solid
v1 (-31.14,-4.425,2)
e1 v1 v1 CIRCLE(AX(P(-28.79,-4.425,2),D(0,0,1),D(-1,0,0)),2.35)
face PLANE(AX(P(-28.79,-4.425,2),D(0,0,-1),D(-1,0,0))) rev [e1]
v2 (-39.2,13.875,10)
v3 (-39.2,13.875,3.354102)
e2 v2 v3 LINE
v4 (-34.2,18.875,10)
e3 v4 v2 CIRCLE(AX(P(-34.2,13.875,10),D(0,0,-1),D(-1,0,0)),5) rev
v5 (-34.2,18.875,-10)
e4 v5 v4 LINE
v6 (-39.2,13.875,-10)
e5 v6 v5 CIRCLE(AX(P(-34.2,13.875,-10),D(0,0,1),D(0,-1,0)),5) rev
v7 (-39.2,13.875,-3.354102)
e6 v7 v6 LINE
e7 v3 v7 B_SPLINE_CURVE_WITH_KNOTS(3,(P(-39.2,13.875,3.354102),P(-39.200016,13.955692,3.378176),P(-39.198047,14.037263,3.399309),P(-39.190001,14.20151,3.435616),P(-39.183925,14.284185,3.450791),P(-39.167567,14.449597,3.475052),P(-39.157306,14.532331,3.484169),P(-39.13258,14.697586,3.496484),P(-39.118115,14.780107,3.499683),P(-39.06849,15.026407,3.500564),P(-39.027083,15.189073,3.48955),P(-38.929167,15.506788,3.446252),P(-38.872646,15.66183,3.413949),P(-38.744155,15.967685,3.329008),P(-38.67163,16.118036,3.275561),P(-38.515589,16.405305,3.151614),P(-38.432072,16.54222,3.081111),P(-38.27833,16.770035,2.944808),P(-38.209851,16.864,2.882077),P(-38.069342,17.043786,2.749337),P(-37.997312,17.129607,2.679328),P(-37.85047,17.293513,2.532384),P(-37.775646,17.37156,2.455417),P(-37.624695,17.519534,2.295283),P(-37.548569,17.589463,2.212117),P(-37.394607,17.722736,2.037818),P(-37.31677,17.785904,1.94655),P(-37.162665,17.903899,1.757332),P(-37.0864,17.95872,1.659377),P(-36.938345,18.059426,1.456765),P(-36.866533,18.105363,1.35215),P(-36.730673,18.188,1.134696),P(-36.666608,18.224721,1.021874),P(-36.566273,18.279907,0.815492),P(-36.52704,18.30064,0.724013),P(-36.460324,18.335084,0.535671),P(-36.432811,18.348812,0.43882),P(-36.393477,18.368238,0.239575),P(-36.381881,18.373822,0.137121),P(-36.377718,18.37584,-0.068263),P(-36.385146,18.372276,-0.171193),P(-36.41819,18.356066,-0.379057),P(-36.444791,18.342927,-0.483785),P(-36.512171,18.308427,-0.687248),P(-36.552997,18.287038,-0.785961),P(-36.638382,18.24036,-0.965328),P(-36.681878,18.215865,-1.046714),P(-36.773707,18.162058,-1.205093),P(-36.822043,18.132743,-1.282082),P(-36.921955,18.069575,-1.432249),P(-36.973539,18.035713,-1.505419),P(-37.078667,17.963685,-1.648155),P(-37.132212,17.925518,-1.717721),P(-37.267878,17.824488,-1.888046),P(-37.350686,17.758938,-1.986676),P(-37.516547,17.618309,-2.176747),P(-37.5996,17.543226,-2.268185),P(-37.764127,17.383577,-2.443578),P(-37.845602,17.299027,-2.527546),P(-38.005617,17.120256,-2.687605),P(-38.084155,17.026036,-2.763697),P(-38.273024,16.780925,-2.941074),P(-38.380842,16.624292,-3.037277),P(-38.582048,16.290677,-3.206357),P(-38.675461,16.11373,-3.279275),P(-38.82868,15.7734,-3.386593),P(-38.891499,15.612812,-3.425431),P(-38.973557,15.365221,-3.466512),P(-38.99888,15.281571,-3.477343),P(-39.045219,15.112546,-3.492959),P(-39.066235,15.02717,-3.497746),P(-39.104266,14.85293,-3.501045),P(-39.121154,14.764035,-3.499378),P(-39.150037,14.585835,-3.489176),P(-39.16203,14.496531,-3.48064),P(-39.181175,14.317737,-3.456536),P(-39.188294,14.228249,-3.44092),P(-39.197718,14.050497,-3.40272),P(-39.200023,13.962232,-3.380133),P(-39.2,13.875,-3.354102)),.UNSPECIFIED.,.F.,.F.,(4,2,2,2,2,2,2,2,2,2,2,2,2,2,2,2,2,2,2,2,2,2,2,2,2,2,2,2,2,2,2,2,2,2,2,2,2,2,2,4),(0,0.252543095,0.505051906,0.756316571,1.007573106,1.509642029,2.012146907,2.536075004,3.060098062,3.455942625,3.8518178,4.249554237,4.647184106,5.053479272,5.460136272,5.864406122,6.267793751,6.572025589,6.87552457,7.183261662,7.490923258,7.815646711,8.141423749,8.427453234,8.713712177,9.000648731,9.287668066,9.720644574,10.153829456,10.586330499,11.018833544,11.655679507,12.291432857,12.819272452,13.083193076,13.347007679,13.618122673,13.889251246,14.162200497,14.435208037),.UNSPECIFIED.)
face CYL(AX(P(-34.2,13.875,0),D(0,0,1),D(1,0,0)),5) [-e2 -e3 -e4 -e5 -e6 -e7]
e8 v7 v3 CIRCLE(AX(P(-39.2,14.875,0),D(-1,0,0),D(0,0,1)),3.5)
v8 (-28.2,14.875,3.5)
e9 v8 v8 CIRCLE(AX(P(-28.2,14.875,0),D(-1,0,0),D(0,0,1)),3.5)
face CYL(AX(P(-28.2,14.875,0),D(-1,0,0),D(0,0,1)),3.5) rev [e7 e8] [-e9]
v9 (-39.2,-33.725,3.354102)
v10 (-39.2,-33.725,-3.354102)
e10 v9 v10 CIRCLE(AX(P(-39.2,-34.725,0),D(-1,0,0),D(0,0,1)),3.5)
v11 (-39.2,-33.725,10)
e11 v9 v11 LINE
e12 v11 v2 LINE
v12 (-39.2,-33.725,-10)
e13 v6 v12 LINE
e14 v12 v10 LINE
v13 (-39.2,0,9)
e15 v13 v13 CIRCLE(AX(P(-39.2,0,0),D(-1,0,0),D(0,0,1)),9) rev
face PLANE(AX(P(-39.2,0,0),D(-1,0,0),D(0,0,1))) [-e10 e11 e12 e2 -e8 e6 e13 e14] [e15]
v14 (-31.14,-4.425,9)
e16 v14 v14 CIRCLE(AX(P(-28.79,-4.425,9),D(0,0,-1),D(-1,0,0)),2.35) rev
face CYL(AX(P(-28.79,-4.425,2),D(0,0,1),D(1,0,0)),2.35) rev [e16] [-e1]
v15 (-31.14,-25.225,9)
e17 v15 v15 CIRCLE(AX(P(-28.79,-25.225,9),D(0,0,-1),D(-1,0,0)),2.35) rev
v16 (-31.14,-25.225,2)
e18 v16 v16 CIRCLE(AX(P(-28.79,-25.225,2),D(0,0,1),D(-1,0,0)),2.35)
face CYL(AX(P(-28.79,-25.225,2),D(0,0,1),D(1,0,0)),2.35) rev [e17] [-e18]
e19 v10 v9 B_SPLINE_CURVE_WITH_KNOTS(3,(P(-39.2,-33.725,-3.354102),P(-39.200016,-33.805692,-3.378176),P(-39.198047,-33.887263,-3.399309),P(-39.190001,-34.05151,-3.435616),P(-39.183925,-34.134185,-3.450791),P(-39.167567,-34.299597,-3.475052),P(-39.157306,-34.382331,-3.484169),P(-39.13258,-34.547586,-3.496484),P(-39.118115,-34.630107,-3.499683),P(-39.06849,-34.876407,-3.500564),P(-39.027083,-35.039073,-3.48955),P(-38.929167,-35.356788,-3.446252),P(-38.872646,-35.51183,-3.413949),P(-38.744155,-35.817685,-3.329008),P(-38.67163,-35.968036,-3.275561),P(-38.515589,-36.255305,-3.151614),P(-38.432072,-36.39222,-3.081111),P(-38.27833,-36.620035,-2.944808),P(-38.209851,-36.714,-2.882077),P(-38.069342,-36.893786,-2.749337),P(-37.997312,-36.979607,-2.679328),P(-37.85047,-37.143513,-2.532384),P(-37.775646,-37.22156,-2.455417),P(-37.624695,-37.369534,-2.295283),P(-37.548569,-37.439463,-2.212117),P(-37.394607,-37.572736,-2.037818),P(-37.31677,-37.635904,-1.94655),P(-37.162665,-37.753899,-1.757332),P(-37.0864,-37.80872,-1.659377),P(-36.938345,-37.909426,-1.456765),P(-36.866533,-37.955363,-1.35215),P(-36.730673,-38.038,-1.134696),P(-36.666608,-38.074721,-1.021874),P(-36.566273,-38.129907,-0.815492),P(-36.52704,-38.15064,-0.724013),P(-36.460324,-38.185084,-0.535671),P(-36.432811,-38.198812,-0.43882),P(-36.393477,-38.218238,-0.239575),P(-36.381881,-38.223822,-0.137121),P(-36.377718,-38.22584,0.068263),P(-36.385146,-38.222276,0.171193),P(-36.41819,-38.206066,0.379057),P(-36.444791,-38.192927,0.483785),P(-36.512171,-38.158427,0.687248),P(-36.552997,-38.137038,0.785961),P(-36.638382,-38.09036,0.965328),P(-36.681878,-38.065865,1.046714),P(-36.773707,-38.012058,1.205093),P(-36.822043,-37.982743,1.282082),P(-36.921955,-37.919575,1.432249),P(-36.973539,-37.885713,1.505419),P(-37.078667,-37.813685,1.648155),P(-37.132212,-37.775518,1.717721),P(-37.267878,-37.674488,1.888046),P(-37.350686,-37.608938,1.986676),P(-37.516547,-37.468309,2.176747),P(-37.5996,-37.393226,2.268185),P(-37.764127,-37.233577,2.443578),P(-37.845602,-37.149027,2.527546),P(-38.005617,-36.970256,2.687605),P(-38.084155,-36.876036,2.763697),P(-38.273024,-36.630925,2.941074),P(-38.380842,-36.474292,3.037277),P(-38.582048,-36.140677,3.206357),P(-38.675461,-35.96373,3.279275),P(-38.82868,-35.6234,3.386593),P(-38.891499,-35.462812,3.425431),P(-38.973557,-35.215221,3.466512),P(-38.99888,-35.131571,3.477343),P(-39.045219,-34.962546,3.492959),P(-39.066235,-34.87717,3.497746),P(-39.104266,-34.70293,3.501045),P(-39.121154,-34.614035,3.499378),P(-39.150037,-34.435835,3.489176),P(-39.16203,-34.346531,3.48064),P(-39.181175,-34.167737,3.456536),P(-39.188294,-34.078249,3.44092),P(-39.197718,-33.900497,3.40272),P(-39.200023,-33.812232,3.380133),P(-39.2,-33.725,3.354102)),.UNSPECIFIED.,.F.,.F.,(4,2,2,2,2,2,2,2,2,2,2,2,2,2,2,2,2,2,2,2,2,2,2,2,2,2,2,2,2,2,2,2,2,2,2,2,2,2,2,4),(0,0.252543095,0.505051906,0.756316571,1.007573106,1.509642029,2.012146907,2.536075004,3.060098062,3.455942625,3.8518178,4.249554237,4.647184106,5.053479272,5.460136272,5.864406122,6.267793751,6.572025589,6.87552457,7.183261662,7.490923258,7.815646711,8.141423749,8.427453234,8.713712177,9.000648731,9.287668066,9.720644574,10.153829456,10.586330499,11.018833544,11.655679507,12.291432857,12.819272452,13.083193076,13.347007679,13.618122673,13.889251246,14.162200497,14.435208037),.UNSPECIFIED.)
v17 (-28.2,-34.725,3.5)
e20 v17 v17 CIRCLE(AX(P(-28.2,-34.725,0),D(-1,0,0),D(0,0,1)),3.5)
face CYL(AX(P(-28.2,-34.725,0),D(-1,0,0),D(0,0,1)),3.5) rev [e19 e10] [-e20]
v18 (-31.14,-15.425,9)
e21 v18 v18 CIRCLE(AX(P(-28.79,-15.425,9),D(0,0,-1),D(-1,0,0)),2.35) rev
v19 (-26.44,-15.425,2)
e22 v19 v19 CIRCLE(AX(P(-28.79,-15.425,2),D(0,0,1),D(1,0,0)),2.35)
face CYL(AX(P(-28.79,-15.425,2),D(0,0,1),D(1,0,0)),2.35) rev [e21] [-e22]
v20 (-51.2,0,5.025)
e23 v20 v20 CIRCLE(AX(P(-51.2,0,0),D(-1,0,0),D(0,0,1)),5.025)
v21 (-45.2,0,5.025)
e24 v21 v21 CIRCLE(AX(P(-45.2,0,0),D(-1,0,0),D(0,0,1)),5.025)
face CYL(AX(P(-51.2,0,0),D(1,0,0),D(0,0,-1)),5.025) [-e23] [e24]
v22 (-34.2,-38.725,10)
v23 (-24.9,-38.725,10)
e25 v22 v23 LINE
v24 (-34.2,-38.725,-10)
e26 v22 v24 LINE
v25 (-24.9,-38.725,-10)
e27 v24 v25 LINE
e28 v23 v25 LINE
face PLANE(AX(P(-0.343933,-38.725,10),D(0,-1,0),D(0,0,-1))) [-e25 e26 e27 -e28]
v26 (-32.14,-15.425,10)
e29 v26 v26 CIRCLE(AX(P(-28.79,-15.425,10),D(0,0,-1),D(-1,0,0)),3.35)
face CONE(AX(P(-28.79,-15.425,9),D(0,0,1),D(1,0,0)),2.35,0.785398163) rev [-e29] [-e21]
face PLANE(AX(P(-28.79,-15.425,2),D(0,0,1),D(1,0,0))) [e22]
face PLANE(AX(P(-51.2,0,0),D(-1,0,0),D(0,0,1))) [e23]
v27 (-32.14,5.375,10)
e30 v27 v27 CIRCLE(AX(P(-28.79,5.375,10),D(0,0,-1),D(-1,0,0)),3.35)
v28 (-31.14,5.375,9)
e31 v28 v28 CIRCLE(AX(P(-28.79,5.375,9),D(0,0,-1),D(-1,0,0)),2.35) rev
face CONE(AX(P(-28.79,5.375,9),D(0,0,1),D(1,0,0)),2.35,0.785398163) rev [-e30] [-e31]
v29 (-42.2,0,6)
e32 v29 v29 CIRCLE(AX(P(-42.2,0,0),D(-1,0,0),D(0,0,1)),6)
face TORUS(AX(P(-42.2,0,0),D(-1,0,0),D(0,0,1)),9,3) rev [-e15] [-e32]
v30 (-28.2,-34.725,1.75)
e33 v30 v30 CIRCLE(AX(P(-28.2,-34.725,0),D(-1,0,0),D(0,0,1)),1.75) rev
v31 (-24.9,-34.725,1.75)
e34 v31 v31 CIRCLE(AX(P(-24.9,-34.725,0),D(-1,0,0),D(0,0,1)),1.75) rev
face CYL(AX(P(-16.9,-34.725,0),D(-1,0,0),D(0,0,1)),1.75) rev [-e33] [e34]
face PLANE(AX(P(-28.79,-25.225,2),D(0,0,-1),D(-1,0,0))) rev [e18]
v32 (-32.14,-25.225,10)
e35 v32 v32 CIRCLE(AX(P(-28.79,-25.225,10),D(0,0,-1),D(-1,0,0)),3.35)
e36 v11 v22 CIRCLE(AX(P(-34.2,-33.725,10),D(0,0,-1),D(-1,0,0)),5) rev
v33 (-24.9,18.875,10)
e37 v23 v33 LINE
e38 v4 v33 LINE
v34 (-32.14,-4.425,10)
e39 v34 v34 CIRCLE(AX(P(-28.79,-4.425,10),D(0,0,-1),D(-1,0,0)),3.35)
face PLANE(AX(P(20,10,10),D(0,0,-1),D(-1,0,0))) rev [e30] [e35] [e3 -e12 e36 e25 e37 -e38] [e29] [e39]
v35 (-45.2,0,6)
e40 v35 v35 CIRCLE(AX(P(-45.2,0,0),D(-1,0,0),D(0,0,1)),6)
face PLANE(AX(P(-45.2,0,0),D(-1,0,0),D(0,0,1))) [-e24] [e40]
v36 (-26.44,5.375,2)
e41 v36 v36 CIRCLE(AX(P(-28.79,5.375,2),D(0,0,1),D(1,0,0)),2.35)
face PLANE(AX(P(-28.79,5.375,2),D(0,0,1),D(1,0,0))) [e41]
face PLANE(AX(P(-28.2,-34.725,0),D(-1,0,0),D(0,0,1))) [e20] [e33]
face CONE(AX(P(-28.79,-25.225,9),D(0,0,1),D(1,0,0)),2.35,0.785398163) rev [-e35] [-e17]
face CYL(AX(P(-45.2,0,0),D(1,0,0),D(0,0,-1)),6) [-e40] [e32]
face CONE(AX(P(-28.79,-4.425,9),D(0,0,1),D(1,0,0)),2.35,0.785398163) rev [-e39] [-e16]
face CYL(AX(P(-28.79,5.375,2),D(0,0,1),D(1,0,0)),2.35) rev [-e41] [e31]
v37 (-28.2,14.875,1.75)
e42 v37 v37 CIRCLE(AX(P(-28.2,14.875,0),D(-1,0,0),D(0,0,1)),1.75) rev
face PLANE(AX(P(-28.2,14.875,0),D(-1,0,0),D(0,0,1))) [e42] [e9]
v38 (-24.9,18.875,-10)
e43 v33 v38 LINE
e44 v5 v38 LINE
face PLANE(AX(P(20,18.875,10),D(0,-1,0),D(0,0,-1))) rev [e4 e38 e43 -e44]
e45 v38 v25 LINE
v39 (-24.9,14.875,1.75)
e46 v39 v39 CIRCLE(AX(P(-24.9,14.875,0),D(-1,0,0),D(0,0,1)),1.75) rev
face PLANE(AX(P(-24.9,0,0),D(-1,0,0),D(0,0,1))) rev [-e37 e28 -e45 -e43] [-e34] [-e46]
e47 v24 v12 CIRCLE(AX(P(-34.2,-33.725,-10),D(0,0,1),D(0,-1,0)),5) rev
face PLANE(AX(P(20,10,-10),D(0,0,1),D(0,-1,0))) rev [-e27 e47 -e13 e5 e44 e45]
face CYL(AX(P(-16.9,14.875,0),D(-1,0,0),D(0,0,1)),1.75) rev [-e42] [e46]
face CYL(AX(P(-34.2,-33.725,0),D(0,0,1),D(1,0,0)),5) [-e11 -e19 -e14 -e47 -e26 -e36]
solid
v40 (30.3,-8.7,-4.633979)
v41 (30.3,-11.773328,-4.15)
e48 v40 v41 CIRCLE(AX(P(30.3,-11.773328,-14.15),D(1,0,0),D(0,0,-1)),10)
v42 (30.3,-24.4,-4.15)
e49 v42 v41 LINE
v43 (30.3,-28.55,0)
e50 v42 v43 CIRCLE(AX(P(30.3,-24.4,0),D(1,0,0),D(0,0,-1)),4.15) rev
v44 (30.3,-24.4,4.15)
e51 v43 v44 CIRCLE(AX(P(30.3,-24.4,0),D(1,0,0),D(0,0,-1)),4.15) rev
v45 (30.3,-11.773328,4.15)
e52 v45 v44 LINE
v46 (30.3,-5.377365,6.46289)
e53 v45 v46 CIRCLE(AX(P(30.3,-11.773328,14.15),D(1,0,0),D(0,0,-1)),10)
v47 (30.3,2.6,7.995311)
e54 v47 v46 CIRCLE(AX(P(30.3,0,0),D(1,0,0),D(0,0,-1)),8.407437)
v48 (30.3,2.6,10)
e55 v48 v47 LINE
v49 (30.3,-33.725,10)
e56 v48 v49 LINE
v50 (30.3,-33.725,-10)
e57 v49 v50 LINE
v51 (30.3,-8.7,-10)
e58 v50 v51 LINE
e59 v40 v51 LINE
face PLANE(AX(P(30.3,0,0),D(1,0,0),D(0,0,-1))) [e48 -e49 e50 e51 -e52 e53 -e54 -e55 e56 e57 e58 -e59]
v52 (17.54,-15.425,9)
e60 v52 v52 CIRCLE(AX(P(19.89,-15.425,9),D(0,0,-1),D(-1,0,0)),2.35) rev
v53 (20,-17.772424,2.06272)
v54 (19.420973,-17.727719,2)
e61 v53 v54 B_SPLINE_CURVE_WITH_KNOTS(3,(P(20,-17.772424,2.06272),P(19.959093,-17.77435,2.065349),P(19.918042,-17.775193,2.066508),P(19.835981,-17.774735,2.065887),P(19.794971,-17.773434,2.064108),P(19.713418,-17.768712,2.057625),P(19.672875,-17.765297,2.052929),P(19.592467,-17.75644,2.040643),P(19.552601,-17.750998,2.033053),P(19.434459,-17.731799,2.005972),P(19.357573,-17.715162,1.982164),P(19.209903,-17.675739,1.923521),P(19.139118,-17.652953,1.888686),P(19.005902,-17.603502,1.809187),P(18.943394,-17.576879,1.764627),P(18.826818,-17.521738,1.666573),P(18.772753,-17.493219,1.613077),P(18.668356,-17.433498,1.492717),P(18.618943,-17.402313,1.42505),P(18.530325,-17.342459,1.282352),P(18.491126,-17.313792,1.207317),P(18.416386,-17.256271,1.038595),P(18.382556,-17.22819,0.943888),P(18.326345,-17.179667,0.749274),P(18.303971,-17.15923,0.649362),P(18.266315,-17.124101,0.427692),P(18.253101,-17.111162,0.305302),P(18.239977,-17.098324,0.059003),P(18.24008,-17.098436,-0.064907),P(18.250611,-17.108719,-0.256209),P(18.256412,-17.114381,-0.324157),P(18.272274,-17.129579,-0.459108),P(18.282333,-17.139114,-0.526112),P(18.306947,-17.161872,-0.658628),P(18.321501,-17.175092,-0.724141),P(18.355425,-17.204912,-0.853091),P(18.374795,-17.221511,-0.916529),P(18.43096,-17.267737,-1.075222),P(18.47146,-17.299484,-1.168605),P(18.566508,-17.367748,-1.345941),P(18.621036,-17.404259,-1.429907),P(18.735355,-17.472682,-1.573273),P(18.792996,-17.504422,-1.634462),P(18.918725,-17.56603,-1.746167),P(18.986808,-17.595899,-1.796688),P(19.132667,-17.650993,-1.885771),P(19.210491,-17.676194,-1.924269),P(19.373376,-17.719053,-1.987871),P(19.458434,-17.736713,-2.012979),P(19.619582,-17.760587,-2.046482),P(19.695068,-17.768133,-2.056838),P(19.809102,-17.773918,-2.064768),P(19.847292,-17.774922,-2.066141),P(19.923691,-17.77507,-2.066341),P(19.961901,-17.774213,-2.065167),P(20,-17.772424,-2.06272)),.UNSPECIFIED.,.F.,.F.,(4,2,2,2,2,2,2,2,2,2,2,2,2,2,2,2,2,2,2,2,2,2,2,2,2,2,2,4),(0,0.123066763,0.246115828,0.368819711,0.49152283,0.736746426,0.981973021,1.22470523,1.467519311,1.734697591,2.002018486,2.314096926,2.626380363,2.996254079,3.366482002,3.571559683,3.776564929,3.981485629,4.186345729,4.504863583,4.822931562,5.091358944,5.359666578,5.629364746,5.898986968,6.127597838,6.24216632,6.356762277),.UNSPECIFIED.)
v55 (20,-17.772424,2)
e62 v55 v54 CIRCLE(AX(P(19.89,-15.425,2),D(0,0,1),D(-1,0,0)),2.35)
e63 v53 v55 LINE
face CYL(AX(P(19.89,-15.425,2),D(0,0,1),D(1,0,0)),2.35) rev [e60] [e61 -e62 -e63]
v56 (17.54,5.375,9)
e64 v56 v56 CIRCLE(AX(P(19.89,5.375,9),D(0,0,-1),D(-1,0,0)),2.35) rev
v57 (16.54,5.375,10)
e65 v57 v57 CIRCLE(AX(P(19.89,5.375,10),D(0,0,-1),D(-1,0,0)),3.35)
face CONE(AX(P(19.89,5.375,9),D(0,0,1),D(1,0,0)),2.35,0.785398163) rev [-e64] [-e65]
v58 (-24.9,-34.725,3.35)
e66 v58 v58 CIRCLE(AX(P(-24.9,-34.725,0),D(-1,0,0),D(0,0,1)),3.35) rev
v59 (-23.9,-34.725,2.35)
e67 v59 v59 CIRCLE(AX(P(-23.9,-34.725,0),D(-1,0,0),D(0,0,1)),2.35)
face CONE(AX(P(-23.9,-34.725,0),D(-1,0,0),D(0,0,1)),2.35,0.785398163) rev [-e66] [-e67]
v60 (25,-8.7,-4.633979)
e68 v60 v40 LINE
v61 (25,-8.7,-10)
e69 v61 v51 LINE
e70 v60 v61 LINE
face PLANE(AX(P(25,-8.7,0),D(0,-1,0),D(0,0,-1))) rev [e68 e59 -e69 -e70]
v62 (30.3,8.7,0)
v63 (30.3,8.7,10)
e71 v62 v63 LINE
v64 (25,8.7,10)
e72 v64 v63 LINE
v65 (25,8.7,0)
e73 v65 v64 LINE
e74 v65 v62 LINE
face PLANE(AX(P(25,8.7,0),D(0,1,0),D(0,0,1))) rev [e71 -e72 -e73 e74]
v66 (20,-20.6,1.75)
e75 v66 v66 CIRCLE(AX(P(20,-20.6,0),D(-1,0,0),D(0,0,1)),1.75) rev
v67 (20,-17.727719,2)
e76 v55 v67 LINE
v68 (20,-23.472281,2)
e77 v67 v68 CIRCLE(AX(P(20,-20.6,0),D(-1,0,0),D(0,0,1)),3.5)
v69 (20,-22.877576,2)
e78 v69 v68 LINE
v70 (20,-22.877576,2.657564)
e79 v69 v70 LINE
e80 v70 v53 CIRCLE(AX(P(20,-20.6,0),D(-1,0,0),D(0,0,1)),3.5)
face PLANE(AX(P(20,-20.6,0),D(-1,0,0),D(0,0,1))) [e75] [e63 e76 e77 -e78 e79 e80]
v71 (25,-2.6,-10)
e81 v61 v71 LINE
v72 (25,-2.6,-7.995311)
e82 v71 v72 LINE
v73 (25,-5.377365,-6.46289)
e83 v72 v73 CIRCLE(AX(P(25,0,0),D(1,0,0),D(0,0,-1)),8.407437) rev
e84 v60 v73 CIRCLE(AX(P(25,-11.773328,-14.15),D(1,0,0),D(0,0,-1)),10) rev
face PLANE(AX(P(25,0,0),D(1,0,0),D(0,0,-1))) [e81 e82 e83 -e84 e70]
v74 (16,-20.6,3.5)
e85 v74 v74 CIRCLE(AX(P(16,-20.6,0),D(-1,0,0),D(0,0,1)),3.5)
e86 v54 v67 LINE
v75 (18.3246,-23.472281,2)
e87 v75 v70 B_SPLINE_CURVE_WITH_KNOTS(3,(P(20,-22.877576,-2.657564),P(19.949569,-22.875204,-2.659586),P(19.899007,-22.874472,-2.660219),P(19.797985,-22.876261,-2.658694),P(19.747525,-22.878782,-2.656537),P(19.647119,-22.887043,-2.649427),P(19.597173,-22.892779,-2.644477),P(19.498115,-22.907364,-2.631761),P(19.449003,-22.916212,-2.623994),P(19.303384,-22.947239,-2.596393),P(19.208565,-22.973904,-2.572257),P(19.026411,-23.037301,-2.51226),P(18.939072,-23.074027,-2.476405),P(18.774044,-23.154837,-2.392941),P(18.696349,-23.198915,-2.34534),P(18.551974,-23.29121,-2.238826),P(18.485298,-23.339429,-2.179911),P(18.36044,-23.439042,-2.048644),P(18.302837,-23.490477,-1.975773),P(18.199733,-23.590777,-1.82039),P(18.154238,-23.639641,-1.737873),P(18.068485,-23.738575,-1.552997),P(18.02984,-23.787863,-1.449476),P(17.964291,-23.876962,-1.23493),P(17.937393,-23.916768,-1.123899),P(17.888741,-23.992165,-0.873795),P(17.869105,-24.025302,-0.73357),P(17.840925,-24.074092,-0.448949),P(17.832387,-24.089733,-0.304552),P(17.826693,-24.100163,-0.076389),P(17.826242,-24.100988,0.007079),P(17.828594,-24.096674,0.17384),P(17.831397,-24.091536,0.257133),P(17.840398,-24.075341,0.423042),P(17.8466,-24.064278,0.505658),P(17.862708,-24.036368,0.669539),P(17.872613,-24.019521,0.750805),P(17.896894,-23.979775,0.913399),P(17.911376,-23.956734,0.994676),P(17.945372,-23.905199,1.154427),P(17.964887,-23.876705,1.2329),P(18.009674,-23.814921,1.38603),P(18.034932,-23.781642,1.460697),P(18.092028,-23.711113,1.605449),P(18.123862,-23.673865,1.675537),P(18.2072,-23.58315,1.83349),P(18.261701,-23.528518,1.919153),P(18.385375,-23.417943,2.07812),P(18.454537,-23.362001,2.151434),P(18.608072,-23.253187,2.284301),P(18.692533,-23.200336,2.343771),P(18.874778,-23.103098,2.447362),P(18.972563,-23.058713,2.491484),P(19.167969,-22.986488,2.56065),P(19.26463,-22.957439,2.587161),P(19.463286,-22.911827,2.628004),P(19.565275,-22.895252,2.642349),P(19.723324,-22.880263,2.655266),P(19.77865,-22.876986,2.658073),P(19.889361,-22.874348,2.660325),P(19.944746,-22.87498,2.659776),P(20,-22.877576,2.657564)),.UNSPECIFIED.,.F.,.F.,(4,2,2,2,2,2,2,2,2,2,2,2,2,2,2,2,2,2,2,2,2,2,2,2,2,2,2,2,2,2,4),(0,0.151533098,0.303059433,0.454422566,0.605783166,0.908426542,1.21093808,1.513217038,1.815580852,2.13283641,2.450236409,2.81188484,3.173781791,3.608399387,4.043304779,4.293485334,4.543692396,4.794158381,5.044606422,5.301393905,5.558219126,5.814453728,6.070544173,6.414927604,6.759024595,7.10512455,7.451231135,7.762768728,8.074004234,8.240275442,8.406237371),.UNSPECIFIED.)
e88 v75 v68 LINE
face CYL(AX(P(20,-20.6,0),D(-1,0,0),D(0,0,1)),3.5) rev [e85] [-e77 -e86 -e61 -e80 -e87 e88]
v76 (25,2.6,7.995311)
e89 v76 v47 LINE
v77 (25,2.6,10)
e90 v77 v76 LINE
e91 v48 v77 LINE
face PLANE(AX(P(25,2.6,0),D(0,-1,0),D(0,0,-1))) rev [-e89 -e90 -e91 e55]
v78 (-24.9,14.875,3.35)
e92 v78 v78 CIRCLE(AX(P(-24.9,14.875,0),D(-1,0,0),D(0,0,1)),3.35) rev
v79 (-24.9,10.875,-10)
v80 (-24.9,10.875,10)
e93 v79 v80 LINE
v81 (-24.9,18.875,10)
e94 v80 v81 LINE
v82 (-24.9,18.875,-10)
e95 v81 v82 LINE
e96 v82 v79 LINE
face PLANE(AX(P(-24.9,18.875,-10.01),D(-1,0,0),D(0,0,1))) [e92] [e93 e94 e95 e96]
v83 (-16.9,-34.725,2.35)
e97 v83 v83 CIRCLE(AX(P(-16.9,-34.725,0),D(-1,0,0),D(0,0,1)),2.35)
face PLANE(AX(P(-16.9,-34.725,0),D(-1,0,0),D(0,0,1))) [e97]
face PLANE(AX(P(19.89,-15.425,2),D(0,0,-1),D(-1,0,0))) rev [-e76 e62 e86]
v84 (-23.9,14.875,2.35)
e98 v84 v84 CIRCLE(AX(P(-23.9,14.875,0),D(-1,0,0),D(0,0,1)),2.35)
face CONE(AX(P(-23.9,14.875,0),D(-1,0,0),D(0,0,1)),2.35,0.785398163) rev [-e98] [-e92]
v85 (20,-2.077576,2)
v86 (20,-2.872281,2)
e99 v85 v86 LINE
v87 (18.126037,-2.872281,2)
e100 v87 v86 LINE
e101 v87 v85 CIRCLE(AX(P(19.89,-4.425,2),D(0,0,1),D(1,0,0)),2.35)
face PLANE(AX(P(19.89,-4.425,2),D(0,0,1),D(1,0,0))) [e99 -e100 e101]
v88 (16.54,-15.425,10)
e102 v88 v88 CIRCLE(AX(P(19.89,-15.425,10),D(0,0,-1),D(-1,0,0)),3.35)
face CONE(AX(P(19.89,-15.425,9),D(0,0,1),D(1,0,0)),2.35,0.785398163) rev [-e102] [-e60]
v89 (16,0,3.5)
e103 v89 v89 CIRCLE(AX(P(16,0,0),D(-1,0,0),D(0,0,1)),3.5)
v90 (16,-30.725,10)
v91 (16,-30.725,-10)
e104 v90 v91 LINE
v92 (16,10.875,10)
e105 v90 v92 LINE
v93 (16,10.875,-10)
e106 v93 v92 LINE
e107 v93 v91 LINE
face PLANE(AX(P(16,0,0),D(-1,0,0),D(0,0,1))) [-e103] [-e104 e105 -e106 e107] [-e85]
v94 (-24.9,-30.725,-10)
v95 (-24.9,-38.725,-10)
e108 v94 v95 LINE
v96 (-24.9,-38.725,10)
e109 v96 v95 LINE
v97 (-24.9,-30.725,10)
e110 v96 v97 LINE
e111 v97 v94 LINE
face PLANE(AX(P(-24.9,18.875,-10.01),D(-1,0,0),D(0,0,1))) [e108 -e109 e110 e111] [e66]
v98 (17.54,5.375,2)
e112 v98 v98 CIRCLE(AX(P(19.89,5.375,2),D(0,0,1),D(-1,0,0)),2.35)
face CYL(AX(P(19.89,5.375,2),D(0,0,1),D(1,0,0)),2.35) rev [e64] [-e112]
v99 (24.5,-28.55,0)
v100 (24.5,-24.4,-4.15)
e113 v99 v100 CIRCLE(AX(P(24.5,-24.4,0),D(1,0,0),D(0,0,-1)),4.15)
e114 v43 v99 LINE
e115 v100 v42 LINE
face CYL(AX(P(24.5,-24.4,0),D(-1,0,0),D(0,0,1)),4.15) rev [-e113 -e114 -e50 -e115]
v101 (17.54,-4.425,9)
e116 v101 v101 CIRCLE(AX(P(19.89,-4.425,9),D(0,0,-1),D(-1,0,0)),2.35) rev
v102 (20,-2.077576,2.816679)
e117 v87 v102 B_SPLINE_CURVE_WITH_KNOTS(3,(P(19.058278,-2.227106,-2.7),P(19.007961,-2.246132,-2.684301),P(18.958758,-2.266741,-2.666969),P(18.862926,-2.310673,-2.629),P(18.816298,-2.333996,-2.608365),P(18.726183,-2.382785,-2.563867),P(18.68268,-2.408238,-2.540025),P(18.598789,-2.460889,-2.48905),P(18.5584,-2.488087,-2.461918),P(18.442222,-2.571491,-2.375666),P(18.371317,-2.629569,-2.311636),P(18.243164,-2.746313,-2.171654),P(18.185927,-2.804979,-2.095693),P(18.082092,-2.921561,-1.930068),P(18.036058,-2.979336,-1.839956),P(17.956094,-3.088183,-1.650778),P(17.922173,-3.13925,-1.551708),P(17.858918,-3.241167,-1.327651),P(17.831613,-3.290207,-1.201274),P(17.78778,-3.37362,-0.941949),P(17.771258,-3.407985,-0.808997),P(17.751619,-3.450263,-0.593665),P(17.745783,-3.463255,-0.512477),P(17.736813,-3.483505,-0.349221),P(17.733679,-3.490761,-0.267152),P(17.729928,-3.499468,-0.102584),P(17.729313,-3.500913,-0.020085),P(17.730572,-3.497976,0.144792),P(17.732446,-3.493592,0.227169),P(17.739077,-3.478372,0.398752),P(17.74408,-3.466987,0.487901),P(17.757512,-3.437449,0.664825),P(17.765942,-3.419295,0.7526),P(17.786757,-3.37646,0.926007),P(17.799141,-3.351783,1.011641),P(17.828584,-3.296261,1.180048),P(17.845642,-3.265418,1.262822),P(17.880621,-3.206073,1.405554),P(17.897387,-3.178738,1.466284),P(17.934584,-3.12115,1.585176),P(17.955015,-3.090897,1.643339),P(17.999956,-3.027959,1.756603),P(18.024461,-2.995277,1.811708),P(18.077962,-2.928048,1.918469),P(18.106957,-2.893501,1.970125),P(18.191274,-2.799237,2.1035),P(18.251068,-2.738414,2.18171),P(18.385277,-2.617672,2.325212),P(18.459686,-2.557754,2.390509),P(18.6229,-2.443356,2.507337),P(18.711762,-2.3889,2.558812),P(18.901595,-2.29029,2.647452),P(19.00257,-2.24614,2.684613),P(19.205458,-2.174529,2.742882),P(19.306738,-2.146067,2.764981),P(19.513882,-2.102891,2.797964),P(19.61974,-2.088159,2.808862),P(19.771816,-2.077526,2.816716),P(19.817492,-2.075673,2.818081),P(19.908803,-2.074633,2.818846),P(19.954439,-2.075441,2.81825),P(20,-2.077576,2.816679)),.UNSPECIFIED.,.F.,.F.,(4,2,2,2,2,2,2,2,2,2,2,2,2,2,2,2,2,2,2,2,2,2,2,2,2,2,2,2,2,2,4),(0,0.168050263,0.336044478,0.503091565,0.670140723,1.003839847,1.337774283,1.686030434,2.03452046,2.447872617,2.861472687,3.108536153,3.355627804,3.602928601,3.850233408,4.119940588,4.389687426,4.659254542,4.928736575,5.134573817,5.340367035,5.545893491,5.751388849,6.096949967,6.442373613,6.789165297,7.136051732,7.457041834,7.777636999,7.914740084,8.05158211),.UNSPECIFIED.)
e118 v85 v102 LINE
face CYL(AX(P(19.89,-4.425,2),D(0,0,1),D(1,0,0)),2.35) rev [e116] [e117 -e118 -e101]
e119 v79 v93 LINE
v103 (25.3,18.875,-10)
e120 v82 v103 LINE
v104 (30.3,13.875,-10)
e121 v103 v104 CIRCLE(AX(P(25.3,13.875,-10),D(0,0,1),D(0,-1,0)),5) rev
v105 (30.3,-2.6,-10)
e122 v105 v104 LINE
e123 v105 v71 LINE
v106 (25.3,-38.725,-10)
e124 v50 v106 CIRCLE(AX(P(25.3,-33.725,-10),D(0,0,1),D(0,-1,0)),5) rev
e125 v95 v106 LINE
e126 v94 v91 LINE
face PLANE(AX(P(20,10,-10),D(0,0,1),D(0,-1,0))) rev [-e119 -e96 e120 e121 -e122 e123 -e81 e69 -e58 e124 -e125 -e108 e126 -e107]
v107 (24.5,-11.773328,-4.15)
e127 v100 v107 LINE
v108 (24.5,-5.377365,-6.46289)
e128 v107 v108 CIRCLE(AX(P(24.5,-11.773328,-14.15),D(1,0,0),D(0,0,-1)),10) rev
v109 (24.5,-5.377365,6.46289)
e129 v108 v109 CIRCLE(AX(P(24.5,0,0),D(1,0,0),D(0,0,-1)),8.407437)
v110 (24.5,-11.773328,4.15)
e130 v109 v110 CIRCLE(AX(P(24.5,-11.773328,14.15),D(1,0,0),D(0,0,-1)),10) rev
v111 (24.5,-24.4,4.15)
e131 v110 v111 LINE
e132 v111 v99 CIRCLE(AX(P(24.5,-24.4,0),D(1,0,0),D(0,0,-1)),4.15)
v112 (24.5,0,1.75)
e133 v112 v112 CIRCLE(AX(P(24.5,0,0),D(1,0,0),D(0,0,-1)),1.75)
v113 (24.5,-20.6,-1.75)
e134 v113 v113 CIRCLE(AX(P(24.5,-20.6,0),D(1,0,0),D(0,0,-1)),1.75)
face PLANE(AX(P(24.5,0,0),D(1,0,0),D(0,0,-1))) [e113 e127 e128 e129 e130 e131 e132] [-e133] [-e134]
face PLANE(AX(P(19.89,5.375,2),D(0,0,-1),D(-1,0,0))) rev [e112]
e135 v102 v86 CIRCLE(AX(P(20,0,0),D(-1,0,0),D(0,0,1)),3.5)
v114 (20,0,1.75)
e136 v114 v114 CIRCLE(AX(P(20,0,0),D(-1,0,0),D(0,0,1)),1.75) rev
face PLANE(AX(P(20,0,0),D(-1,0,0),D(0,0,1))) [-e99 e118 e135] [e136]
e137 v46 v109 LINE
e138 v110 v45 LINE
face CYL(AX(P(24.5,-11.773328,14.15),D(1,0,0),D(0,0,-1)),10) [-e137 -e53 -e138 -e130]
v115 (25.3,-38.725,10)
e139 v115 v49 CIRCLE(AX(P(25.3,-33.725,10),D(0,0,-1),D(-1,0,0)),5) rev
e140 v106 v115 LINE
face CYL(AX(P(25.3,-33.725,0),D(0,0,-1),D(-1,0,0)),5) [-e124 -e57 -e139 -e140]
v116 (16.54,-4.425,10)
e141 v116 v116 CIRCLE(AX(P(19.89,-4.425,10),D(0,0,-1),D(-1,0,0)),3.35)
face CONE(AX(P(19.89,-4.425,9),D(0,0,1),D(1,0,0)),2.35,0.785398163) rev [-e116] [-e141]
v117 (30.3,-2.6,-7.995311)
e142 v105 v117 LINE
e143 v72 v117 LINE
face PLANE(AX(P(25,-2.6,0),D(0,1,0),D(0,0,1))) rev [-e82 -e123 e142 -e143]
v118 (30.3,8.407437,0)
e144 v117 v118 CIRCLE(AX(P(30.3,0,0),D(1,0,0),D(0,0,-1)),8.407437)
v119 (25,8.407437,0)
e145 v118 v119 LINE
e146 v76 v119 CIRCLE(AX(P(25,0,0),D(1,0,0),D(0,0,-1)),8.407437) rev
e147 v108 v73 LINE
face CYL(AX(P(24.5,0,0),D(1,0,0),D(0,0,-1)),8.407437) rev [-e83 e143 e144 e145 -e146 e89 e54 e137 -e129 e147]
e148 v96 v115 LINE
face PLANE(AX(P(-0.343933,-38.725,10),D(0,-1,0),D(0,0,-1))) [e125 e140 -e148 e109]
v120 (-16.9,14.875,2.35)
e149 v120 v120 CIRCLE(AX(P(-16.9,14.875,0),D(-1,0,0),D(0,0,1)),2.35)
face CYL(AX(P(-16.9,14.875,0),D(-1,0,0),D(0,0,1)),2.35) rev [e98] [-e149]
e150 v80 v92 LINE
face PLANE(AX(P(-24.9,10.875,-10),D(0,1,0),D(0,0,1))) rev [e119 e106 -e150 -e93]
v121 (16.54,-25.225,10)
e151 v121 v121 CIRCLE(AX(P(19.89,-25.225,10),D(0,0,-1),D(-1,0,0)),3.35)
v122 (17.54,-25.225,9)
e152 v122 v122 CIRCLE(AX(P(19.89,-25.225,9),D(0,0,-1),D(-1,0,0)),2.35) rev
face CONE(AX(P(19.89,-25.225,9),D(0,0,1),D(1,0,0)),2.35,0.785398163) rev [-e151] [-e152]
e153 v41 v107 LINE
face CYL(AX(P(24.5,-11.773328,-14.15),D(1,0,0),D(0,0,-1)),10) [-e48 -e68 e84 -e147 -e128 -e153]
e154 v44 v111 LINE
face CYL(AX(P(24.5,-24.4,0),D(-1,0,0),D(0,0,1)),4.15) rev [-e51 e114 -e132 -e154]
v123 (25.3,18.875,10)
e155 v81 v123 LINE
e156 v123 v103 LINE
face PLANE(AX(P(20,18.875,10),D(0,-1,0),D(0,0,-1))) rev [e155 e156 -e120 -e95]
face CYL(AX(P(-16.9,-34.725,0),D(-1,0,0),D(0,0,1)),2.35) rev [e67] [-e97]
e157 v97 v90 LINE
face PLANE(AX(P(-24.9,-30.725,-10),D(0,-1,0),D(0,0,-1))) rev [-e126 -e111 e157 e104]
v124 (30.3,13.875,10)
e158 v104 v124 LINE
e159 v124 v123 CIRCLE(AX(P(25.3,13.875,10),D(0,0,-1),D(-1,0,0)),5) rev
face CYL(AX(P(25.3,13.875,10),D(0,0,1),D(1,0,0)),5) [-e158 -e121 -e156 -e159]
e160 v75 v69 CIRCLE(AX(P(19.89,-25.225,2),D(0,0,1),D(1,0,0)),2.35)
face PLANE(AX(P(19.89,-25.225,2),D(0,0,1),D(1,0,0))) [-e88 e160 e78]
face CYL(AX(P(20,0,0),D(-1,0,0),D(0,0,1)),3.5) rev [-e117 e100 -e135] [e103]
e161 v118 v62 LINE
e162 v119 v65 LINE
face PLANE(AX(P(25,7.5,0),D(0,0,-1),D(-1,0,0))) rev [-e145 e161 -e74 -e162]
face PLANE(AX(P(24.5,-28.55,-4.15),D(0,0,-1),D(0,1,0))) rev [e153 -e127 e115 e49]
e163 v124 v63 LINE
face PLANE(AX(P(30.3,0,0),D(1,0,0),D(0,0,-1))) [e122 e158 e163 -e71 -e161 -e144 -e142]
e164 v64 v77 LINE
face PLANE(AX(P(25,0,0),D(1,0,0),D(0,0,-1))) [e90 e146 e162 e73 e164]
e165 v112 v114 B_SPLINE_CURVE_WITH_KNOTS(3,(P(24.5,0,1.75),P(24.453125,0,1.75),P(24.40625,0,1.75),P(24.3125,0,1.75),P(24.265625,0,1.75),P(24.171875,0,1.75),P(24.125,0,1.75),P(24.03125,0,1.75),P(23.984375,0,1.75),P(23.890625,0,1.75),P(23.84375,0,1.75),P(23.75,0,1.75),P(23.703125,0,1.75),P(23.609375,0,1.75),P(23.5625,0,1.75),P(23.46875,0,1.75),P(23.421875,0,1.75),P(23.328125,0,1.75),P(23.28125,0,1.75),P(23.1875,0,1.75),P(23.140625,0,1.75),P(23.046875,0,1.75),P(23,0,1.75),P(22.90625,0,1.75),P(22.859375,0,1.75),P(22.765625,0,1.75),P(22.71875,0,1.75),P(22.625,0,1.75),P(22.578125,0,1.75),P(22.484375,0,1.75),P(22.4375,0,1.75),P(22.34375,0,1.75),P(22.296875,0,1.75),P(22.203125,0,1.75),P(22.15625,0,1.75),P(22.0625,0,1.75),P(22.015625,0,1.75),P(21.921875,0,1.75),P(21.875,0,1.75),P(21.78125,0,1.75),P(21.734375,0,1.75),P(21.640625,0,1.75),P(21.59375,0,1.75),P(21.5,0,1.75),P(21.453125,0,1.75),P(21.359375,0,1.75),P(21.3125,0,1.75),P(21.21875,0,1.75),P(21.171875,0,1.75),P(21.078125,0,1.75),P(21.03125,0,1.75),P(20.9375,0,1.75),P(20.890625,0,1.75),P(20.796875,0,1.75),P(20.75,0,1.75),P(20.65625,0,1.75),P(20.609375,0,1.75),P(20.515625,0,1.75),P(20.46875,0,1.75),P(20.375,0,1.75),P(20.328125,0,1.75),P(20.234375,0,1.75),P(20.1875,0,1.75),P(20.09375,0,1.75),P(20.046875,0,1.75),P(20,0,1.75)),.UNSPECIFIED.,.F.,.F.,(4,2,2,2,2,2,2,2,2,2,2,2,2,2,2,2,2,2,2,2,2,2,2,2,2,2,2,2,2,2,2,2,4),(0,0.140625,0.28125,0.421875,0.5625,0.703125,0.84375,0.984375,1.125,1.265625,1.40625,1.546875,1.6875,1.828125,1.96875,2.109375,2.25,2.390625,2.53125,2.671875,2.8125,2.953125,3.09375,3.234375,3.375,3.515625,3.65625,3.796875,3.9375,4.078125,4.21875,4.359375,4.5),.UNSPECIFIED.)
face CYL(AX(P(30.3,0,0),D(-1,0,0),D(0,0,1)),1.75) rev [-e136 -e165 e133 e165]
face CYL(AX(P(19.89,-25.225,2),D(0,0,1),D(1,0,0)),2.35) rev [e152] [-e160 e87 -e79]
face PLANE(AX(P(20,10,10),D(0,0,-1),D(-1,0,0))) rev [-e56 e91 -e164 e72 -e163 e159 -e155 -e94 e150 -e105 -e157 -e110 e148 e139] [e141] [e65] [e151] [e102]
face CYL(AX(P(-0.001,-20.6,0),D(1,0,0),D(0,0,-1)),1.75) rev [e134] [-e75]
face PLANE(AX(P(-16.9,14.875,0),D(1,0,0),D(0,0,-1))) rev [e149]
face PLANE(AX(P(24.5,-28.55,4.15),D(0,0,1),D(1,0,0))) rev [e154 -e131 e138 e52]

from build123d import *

# Parameters (mm, degrees)
SKETCH1_W              = 20
SKETCH1_H              = 20
BOSS_EXTRUDE1_DEPTH    = 20
SKETCH2_W              = 20
SKETCH2_H              = 70
BOSS_EXTRUDE2_DEPTH    = 10.3
CUT_EXTRUDE1_DEPTH     = 5.8
FILLET1_R              = 4.15
FILLET2_R              = 10
SKETCH5_R              = 1.75
CUT_EXTRUDE2_DEPTH     = 48.361271098
CUT_EXTRUDE3_REACH     = 45.878
SKETCH6_R              = 1.75
SKETCH13_W             = 20
SKETCH13_H             = 20
CUT_EXTRUDE9_DEPTH     = 20
CUT_EXTRUDE18_DEPTH    = 5.3
SKETCH32_W             = 20
SKETCH32_H             = 3.725
BOSS_EXTRUDE3_DEPTH    = 10.3
SKETCH31_W             = 20
SKETCH31_H             = 16.125
CUT_EXTRUDE19_DEPTH    = 42.300310229
SKETCH34_W             = 20
SKETCH34_H             = 57.6
SKETCH34_R             = 1.75
BOSS_EXTRUDE5_DEPTH    = 4
SKETCH35_W             = 20
SKETCH35_H             = 8
BOSS_EXTRUDE6_DEPTH    = 40.9
SKETCH37_W             = 20
SKETCH37_H             = 57.6
BOSS_EXTRUDE7_DEPTH    = 14.3
SKETCH38_R             = 2.35
CUT_EXTRUDE20_DEPTH    = 8
CHAMFER1_SIZE          = 1
SKETCH41_R             = 3.5
CUT_EXTRUDE23_DEPTH    = 4
SKETCH42_R             = 1.75
CUT_EXTRUDE24_DEPTH    = 22.3
SKETCH43_R             = 3.5
CUT_EXTRUDE25_DEPTH    = 11
FILLET3_R              = 5
SPLIT1_SURFACE_1_BACK  = 93.455
SPLIT1_SURFACE_1_DEPTH = 186.91
SPLIT1_SURFACE_2_BACK  = 93.455
SPLIT1_SURFACE_2_DEPTH = 186.91
SKETCH45_R             = 2.35
CUT_EXTRUDE26_DEPTH    = 8
CHAMFER2_SIZE          = 1
SKETCH46_R             = 5.025
BOSS_EXTRUDE8_DEPTH    = 12
SKETCH50_R             = 6
BOSS_EXTRUDE9_DEPTH    = 6
FILLET6_R              = 3


# Some blends are built 0.0001 mm under size
with BuildPart() as part:
    # Sketch1 → Boss-Extrude1 (new body)
    with BuildSketch(Plane(origin=(0, 0, 0), x_dir=(0, 0, -1), z_dir=(1, 0, 0))):
        Rectangle(SKETCH1_W, SKETCH1_H)
    extrude(amount=BOSS_EXTRUDE1_DEPTH)

    # Sketch2 → Boss-Extrude2 (add)
    with BuildSketch(Plane(origin=(20, 0, 0), x_dir=(0, 0, -1), z_dir=(1, 0, 0))):
        Rectangle(SKETCH2_W, SKETCH2_H)
    extrude(amount=BOSS_EXTRUDE2_DEPTH)

    # Sketch4 → Cut-Extrude1 (cut)
    with BuildSketch(Plane(origin=(30.3, 0, 0), x_dir=(0, 0, -1), z_dir=(1, 0, 0))):
        with BuildLine():
            Line((4.15, -28.55), (-4.15, -28.55))
            Line((-4.15, -28.55), (-4.15, -7.311805523))
            ThreePointArc((-4.15, -7.311805523), (0, 8.407437184), (4.15, -7.311805523))
            Line((4.15, -7.311805523), (4.15, -28.55))
        make_face()
    extrude(amount=-CUT_EXTRUDE1_DEPTH, mode=Mode.SUBTRACT)

    # Fillet1
    fillet1_edges = [part.edges().sort_by_distance(p)[0] for p in [
        (27.4, -28.55, 4.15),
        (27.4, -28.55, -4.15),
    ]]
    fillet(fillet1_edges, radius=FILLET1_R - 0.0001)  # a hair under: the kernel refuses the full size

    # Fillet2
    fillet2_edges = [part.edges().sort_by_distance(p)[0] for p in [
        (27.4, -7.311805523, 4.15),
        (27.4, -7.311805523, -4.15),
    ]]
    fillet(fillet2_edges, radius=FILLET2_R)

    # Sketch5 → Cut-Extrude2 (cut, through all)
    with BuildSketch(Plane.ZY):
        Circle(SKETCH5_R)
    extrude(amount=-CUT_EXTRUDE2_DEPTH, mode=Mode.SUBTRACT)

    # Sketch6 → Cut-Extrude3 (cut, up to next)
    with BuildSketch(Plane(origin=(24.5, 0, 0), x_dir=(0, 0, -1), z_dir=(1, 0, 0)), mode=Mode.PRIVATE) as cut_extrude3_sk1:
        with Locations((0, -20.6)):
            Circle(SKETCH6_R)
    cut_extrude3_tool1 = extrude(cut_extrude3_sk1.sketch, amount=-CUT_EXTRUDE3_REACH, mode=Mode.PRIVATE) & part.part
    add(cut_extrude3_tool1.solids().sort_by_distance((24.5, -20.6, 0))[0], mode=Mode.SUBTRACT)

    # Sketch13 → Cut-Extrude9 (cut)
    with BuildSketch(Plane.ZY):
        Rectangle(SKETCH13_W, SKETCH13_H)
    extrude(amount=-CUT_EXTRUDE9_DEPTH, mode=Mode.SUBTRACT)

    # Sketch29 → Cut-Extrude18 (cut)
    with BuildSketch(Plane(origin=(30.3, 0, 0), x_dir=(0, 0, -1), z_dir=(1, 0, 0))):
        Polygon((15.109449768, -8.7), (15.109449768, -2.6), (0, -2.6), (0, -3.8), (0, -7.5), (0, -8.7), align=None)
        Polygon((0, 2.6), (-15.109449768, 2.6), (-15.109449768, 8.7), (0, 8.7), (0, 7.5), (0, 3.8), align=None)
    extrude(amount=-CUT_EXTRUDE18_DEPTH, mode=Mode.SUBTRACT)

    # Sketch32 → Boss-Extrude3 (add)
    with BuildSketch(Plane(origin=(30.3, 0, 0), x_dir=(0, 0, -1), z_dir=(1, 0, 0))):
        with Locations((0, -36.8625)):
            Rectangle(SKETCH32_W, SKETCH32_H)
    extrude(amount=-BOSS_EXTRUDE3_DEPTH)

    # Sketch31 → Cut-Extrude19 (cut, through all)
    with BuildSketch(Plane(origin=(30.3, 0, 0), x_dir=(0, 0, -1), z_dir=(1, 0, 0))):
        with Locations((0, 26.9375)):
            Rectangle(SKETCH31_W, SKETCH31_H)
    extrude(amount=-CUT_EXTRUDE19_DEPTH, mode=Mode.SUBTRACT)

    # Sketch34 → Boss-Extrude5 (add)
    with BuildSketch(Plane.ZY.offset(-20)):
        with Locations((0, -9.925)):
            Rectangle(SKETCH34_W, SKETCH34_H)
        with Locations(Location((0, -20.6, 0), (0, 0, 180))):
            Circle(SKETCH34_R, mode=Mode.SUBTRACT)
        Circle(SKETCH34_R, mode=Mode.SUBTRACT)
    extrude(amount=BOSS_EXTRUDE5_DEPTH)

    # Sketch35 → Boss-Extrude6 (add)
    with BuildSketch(Plane.ZY.offset(-16)):
        with Locations((0, 14.875)):
            Rectangle(SKETCH35_W, SKETCH35_H)
        with Locations((0, -34.725)):
            Rectangle(SKETCH35_W, SKETCH35_H)
    extrude(amount=BOSS_EXTRUDE6_DEPTH)

    # Sketch37 → Boss-Extrude7 (add)
    with BuildSketch(Plane.ZY.offset(24.9)):
        with Locations((0, -9.925)):
            Rectangle(SKETCH37_W, SKETCH37_H)
    extrude(amount=BOSS_EXTRUDE7_DEPTH)

    # Sketch38 → Cut-Extrude20 (cut)
    with BuildSketch(Plane.XY.offset(10)):
        with Locations((-28.79, 5.375)):
            Circle(SKETCH38_R)
        with Locations(Location((-28.79, -4.425, 0), (0, 0, 180))):
            Circle(SKETCH38_R)
        with Locations(Location((-28.79, -25.225, 0), (0, 0, 180))):
            Circle(SKETCH38_R)
        with Locations((-28.79, -15.425)):
            Circle(SKETCH38_R)
        with Locations(Location((19.89, 5.375, 0), (0, 0, 180))):
            Circle(SKETCH38_R)
        with Locations((19.89, -4.425)):
            Circle(SKETCH38_R)
        with Locations(Location((19.89, -15.425, 0), (0, 0, 180))):
            Circle(SKETCH38_R)
        with Locations((19.89, -25.225)):
            Circle(SKETCH38_R)
    extrude(amount=-CUT_EXTRUDE20_DEPTH, mode=Mode.SUBTRACT)

    # Chamfer1
    chamfer1_edges = [part.edges().sort_by_distance(p)[0] for p in [
        (22.24, 5.375, 10),
        (-31.14, -15.425, 10),
        (-26.44, -25.225, 10),
        (-26.44, -4.425, 10),
        (17.54, -4.425, 10),
        (22.24, -15.425, 10),
        (17.54, -25.225, 10),
        (-31.14, 5.375, 10),
    ]]
    chamfer(chamfer1_edges, length=CHAMFER1_SIZE)

    # Sketch41 → Cut-Extrude23 (cut)
    with BuildSketch(Plane.ZY.offset(-16)):
        Circle(SKETCH41_R)
        with Locations((0, -20.6)):
            Circle(SKETCH41_R)
    extrude(amount=-CUT_EXTRUDE23_DEPTH, mode=Mode.SUBTRACT)

    # Sketch42 → Cut-Extrude24 (cut)
    with BuildSketch(Plane.ZY.offset(39.2)):
        with Locations((0, -34.725)):
            Circle(SKETCH42_R)
        with Locations(Location((0, 14.875, 0), (0, 0, 180))):
            Circle(SKETCH42_R)
    extrude(amount=-CUT_EXTRUDE24_DEPTH, mode=Mode.SUBTRACT)

    # Sketch43 → Cut-Extrude25 (cut)
    with BuildSketch(Plane.ZY.offset(39.2)):
        with Locations((0, 14.875)):
            Circle(SKETCH43_R)
        with Locations((0, -34.725)):
            Circle(SKETCH43_R)
    extrude(amount=-CUT_EXTRUDE25_DEPTH, mode=Mode.SUBTRACT)

    # Fillet3
    # the kernel refuses this fillet: 5 mm, written as the material it takes off along each edge
    with BuildSketch(Plane(origin=(30.3, -38.725, -22.5), x_dir=(-1, 0, 0), z_dir=(0, 0, 1)), Plane(origin=(-39.2, 18.875, -22.5), x_dir=(1, 0, 0), z_dir=(0, 0, 1))) as fillet3_piece_1:
        with BuildLine():
            CenterArc((FILLET3_R, -FILLET3_R), FILLET3_R, 90, 90)
            Line((0, -FILLET3_R), (0, 0))
            Line((0, 0), (FILLET3_R, 0))
        make_face()
    extrude(amount=45, mode=Mode.SUBTRACT)
    with BuildSketch(Plane(origin=(30.3, 18.875, -22.5), x_dir=(-1, 0, 0), z_dir=(0, 0, 1)), Plane(origin=(-39.2, -38.725, 22.5), x_dir=(0, 1, 0), z_dir=(0, 0, -1))) as fillet3_piece_2:
        with BuildLine():
            CenterArc((FILLET3_R, FILLET3_R), FILLET3_R, 180, 90)
            Line((0, FILLET3_R), (0, 0))
            Line((0, 0), (FILLET3_R, 0))
        make_face()
    extrude(amount=45, mode=Mode.SUBTRACT)


with BuildPart() as body_2:
    # Split1: the piece behind the surface
    add(part.part)
    # Split1 surface: a surface, the sketch's curves swept straight by 186.91 mm
    with BuildLine(Plane.XY.offset(10).offset(-SPLIT1_SURFACE_1_BACK), mode=Mode.PRIVATE) as split1_surface_1_path:
        Line((-24.9, 18.875), (-24.9, -38.725))
    split1_surface_1 = Shell.extrude(split1_surface_1_path.wire(), (0 * SPLIT1_SURFACE_1_DEPTH, 0 * SPLIT1_SURFACE_1_DEPTH, 1 * SPLIT1_SURFACE_1_DEPTH))
    split(bisect_by=split1_surface_1, keep=Keep.BOTTOM)

    # Sketch46 → Boss-Extrude8 (add)
    with BuildSketch(Plane.ZY.offset(39.2)):
        Circle(SKETCH46_R)
    extrude(amount=BOSS_EXTRUDE8_DEPTH)

    # Sketch50 → Boss-Extrude9 (add)
    with BuildSketch(Plane.ZY.offset(39.2)):
        Circle(SKETCH50_R)
    extrude(amount=BOSS_EXTRUDE9_DEPTH)

    # Fillet6
    fillet6_edges = [body_2.edges().sort_by_distance(p)[0] for p in [
        (-39.2, 0, -6),
    ]]
    fillet(fillet6_edges, radius=FILLET6_R)


with BuildPart() as part_1:
    add(part.part)

    # Split1: split by a surface, the side it looks to stays
    # Split1 surface: a surface, the sketch's curves swept straight by 186.91 mm
    with BuildLine(Plane.XY.offset(10).offset(-SPLIT1_SURFACE_2_BACK), mode=Mode.PRIVATE) as split1_surface_2_path:
        Line((-24.9, 18.875), (-24.9, -38.725))
    split1_surface_2 = Shell.extrude(split1_surface_2_path.wire(), (0 * SPLIT1_SURFACE_2_DEPTH, 0 * SPLIT1_SURFACE_2_DEPTH, 1 * SPLIT1_SURFACE_2_DEPTH))
    split(bisect_by=split1_surface_2, keep=Keep.TOP)

    # Sketch45 → Cut-Extrude26 (cut)
    with BuildSketch(Plane.ZY.offset(24.9)):
        with Locations((0, 14.875)):
            Circle(SKETCH45_R)
        with Locations((0, -34.725)):
            Circle(SKETCH45_R)
    extrude(amount=-CUT_EXTRUDE26_DEPTH, mode=Mode.SUBTRACT)

    # Chamfer2
    chamfer2_edges = [part_1.edges().sort_by_distance(p)[0] for p in [
        (-24.9, 14.875, -2.35),
        (-24.9, -34.725, -2.35),
    ]]
    chamfer(chamfer2_edges, length=CHAMFER2_SIZE)


solid = Compound([body_2.part, part_1.part])
